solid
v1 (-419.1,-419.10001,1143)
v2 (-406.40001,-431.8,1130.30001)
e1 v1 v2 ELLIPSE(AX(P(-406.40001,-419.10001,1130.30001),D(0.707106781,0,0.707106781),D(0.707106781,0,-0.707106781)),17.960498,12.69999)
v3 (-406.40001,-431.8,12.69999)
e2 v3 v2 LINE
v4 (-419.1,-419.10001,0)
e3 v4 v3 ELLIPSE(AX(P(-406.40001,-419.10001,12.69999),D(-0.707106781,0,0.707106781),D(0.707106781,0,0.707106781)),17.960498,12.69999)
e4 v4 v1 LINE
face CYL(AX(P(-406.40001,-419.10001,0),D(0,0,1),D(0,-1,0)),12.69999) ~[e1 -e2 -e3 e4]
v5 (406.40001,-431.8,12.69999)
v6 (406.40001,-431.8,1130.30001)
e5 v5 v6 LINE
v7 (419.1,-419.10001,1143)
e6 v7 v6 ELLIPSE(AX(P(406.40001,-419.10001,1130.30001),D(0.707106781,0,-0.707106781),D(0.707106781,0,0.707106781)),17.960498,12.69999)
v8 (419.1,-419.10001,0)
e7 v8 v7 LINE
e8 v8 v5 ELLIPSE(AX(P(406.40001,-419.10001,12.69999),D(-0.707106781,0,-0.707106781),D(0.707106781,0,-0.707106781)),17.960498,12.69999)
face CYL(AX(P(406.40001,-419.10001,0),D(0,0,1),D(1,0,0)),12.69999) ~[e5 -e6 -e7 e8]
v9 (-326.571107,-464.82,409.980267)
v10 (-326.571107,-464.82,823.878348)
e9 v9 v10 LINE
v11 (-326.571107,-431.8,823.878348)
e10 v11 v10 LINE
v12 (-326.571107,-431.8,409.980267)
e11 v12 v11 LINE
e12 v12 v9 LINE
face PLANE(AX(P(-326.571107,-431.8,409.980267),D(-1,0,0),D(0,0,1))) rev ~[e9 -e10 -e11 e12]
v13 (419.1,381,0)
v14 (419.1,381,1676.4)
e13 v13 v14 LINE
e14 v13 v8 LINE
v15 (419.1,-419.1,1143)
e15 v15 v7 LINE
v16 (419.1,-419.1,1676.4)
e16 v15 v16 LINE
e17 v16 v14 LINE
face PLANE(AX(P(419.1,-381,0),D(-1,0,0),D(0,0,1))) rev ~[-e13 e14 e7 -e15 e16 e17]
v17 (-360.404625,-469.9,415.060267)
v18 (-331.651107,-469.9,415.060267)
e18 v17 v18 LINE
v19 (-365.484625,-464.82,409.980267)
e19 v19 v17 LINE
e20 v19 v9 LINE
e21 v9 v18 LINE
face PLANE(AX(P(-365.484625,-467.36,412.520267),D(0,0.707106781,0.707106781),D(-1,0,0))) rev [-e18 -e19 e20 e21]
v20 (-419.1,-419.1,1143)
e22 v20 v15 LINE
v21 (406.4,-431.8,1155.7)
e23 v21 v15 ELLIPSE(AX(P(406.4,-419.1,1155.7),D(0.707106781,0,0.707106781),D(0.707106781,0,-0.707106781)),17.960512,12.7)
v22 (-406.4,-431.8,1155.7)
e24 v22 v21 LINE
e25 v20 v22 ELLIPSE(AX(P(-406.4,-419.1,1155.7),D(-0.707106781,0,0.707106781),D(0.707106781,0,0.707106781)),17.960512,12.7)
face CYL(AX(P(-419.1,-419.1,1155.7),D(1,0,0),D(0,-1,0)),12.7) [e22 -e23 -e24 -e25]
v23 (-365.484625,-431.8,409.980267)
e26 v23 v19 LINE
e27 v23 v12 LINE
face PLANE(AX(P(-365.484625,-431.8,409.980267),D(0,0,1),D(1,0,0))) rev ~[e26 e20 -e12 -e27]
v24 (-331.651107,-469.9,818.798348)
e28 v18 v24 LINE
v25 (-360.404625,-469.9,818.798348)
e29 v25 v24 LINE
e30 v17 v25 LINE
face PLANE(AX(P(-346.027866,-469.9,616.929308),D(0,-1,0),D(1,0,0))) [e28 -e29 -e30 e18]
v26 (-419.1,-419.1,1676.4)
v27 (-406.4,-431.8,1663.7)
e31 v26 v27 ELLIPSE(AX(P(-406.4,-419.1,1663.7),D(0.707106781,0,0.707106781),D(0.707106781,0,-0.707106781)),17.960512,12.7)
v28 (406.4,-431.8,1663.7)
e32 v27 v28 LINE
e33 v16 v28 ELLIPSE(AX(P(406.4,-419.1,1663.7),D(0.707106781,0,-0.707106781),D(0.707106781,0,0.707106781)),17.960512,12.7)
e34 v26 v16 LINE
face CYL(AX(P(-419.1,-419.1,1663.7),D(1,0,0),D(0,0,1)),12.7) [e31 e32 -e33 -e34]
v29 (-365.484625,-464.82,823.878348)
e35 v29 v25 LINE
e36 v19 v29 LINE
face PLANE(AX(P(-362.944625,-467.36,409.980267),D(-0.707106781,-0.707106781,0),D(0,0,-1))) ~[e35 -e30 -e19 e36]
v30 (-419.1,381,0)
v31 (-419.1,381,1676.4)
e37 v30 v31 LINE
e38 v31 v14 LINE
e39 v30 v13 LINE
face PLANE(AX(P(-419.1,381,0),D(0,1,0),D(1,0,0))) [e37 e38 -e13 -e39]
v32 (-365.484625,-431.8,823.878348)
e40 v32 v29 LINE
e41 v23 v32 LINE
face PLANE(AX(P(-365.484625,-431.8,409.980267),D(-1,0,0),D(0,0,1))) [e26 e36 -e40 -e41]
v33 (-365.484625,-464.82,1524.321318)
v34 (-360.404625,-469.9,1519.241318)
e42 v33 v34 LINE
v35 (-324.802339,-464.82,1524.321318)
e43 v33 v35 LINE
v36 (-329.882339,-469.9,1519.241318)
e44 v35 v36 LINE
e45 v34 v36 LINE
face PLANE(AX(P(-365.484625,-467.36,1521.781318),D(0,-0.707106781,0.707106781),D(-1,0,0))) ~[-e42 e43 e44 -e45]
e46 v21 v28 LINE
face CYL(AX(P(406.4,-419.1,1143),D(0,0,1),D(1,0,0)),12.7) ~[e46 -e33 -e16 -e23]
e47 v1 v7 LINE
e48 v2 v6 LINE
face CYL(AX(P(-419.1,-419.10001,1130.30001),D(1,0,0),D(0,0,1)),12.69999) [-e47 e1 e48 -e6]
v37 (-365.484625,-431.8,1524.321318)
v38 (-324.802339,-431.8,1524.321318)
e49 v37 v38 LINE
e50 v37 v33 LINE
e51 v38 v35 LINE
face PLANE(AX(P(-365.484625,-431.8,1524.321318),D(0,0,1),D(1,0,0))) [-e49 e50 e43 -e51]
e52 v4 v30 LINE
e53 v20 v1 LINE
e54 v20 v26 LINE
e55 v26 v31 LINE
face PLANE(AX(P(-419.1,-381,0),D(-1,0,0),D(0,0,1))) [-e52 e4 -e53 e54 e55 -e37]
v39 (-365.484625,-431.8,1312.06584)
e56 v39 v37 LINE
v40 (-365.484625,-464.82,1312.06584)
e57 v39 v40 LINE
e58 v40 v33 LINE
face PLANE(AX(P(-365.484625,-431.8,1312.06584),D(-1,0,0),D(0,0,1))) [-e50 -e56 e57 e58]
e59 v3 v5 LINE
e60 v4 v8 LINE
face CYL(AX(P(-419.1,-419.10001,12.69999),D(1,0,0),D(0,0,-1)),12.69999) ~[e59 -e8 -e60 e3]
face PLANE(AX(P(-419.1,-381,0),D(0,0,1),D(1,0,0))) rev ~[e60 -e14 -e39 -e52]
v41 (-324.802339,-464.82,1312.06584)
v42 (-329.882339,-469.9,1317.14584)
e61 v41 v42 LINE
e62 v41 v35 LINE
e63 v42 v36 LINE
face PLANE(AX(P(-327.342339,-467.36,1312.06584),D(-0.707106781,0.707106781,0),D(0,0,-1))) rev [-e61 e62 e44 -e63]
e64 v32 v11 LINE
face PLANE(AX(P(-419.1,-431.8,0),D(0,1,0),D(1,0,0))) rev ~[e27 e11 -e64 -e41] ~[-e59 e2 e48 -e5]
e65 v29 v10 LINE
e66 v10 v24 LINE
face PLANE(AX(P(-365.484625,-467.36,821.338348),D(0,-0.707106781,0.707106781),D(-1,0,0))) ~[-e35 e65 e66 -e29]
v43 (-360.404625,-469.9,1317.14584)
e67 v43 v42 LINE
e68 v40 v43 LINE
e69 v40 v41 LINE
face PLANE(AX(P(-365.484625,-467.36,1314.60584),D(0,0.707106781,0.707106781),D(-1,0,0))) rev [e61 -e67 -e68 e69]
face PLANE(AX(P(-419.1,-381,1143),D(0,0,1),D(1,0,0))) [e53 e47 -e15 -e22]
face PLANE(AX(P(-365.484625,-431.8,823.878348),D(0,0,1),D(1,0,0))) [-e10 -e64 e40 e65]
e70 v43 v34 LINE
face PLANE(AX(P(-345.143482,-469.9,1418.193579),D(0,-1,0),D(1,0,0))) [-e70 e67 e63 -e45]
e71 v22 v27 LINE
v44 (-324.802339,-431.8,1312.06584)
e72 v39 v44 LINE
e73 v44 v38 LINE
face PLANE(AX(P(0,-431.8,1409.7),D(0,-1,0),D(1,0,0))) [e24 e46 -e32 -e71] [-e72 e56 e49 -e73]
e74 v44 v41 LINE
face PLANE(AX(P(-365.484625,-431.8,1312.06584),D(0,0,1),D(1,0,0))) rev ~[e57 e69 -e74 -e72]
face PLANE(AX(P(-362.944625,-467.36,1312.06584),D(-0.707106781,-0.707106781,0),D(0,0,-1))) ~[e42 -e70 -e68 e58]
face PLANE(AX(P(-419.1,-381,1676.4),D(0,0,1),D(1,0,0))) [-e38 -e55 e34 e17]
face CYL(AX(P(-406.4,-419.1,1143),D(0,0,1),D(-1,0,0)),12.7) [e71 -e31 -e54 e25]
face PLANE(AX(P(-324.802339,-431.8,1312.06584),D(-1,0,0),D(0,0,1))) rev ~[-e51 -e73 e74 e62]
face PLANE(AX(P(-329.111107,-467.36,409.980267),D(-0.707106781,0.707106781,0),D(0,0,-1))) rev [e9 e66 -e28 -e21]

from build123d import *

# Parameters (mm, degrees)
F0_W      = 838.2
F0_H      = 762
F1_DEPTH  = 1676.4
F2_W      = 838.2
F2_H      = 533.4
F2_W_2    = 38.1
F2_H_2    = 203.2
F3_DEPTH  = 50.8
F4_R      = 12.7
F5_DEPTH  = 50.8
F6_R      = 12.69999
F7_W      = 40.6822860241
F7_H      = 212.2554779053
F8_DEPTH  = 38.1
F9_SIZE   = 5.08
F10_W     = 38.9135181904
F10_H     = 413.8980805874
F11_DEPTH = 38.1
F12_SIZE  = 5.08


# Not quite as in the source:
# - a fillet or chamfer is up to 0.001 mm smaller than in the source, because OpenCascade refuses the exact size


with BuildPart() as f1:
    # F0 (on Top) → F1 (new body)
    with BuildSketch(Plane.XY):
        Rectangle(F0_W, F0_H)
    extrude(amount=F1_DEPTH)

    # F2 (on face) → F3 (join)
    with BuildSketch(Plane.XZ.offset(381)):
        with Locations((0, 1409.7)):
            Rectangle(F2_W, F2_H)
        with Locations((-346.277383852, 1415.0833574295)):
            Rectangle(F2_W_2, F2_H_2, mode=Mode.SUBTRACT)
        with Locations((-346.277383852, 1415.0833574295)):
            Rectangle(F2_W_2, F2_H_2)
    extrude(amount=F3_DEPTH)

    # F4
    f4_edges = [f1.edges().sort_by_distance(p)[0] for p in [
        (0, -431.8, 1676.4),
        (-419.1, -431.8, 1409.7),
        (0, -431.8, 1143),
        (419.1, -431.8, 1409.7),
    ]]
    fillet(f4_edges, radius=F4_R)

    # F5 (add): a face of the model
    f5_faces = [f1.faces().sort_by_distance(p)[0] for p in [
        (0, -381, 571.5),
    ]]
    extrude(f5_faces, amount=F5_DEPTH)

    # F6 (radius 12.7 in the source; OpenCascade refuses exactly that, so slightly less here)
    f6_edges = [f1.edges().sort_by_distance(p)[0] for p in [
        (0, -431.8, 0),
        (419.1, -431.8, 571.5),
        (0, -431.8, 1143),
        (-419.1, -431.8, 571.5),
    ]]
    fillet(f6_edges, radius=F6_R)

    # F7 (on face) → F8 (join)
    with BuildSketch(Plane.XZ.offset(431.8)):
        with Locations((-345.143482089, 1418.1935787201)):
            Rectangle(F7_W, F7_H)
    extrude(amount=F8_DEPTH)

    # F9
    f9_edges = [f1.edges().sort_by_distance(p)[0] for p in [
        (-345.143482, -469.9, 1524.321318),
        (-365.484625, -469.9, 1418.193579),
        (-345.143482, -469.9, 1312.06584),
        (-324.802339, -469.9, 1418.193579),
    ]]
    chamfer(f9_edges, length=F9_SIZE)

    # F10 (on face) → F11 (join)
    with BuildSketch(Plane.XZ.offset(431.8)):
        with Locations((-346.0278660059, 616.92930758)):
            Rectangle(F10_W, F10_H)
    extrude(amount=F11_DEPTH)

    # F12
    f12_edges = [f1.edges().sort_by_distance(p)[0] for p in [
        (-346.027866, -469.9, 823.878348),
        (-365.484625, -469.9, 616.929308),
        (-346.027866, -469.9, 409.980267),
        (-326.571107, -469.9, 616.929308),
    ]]
    chamfer(f12_edges, length=F12_SIZE)


solid = f1.part
